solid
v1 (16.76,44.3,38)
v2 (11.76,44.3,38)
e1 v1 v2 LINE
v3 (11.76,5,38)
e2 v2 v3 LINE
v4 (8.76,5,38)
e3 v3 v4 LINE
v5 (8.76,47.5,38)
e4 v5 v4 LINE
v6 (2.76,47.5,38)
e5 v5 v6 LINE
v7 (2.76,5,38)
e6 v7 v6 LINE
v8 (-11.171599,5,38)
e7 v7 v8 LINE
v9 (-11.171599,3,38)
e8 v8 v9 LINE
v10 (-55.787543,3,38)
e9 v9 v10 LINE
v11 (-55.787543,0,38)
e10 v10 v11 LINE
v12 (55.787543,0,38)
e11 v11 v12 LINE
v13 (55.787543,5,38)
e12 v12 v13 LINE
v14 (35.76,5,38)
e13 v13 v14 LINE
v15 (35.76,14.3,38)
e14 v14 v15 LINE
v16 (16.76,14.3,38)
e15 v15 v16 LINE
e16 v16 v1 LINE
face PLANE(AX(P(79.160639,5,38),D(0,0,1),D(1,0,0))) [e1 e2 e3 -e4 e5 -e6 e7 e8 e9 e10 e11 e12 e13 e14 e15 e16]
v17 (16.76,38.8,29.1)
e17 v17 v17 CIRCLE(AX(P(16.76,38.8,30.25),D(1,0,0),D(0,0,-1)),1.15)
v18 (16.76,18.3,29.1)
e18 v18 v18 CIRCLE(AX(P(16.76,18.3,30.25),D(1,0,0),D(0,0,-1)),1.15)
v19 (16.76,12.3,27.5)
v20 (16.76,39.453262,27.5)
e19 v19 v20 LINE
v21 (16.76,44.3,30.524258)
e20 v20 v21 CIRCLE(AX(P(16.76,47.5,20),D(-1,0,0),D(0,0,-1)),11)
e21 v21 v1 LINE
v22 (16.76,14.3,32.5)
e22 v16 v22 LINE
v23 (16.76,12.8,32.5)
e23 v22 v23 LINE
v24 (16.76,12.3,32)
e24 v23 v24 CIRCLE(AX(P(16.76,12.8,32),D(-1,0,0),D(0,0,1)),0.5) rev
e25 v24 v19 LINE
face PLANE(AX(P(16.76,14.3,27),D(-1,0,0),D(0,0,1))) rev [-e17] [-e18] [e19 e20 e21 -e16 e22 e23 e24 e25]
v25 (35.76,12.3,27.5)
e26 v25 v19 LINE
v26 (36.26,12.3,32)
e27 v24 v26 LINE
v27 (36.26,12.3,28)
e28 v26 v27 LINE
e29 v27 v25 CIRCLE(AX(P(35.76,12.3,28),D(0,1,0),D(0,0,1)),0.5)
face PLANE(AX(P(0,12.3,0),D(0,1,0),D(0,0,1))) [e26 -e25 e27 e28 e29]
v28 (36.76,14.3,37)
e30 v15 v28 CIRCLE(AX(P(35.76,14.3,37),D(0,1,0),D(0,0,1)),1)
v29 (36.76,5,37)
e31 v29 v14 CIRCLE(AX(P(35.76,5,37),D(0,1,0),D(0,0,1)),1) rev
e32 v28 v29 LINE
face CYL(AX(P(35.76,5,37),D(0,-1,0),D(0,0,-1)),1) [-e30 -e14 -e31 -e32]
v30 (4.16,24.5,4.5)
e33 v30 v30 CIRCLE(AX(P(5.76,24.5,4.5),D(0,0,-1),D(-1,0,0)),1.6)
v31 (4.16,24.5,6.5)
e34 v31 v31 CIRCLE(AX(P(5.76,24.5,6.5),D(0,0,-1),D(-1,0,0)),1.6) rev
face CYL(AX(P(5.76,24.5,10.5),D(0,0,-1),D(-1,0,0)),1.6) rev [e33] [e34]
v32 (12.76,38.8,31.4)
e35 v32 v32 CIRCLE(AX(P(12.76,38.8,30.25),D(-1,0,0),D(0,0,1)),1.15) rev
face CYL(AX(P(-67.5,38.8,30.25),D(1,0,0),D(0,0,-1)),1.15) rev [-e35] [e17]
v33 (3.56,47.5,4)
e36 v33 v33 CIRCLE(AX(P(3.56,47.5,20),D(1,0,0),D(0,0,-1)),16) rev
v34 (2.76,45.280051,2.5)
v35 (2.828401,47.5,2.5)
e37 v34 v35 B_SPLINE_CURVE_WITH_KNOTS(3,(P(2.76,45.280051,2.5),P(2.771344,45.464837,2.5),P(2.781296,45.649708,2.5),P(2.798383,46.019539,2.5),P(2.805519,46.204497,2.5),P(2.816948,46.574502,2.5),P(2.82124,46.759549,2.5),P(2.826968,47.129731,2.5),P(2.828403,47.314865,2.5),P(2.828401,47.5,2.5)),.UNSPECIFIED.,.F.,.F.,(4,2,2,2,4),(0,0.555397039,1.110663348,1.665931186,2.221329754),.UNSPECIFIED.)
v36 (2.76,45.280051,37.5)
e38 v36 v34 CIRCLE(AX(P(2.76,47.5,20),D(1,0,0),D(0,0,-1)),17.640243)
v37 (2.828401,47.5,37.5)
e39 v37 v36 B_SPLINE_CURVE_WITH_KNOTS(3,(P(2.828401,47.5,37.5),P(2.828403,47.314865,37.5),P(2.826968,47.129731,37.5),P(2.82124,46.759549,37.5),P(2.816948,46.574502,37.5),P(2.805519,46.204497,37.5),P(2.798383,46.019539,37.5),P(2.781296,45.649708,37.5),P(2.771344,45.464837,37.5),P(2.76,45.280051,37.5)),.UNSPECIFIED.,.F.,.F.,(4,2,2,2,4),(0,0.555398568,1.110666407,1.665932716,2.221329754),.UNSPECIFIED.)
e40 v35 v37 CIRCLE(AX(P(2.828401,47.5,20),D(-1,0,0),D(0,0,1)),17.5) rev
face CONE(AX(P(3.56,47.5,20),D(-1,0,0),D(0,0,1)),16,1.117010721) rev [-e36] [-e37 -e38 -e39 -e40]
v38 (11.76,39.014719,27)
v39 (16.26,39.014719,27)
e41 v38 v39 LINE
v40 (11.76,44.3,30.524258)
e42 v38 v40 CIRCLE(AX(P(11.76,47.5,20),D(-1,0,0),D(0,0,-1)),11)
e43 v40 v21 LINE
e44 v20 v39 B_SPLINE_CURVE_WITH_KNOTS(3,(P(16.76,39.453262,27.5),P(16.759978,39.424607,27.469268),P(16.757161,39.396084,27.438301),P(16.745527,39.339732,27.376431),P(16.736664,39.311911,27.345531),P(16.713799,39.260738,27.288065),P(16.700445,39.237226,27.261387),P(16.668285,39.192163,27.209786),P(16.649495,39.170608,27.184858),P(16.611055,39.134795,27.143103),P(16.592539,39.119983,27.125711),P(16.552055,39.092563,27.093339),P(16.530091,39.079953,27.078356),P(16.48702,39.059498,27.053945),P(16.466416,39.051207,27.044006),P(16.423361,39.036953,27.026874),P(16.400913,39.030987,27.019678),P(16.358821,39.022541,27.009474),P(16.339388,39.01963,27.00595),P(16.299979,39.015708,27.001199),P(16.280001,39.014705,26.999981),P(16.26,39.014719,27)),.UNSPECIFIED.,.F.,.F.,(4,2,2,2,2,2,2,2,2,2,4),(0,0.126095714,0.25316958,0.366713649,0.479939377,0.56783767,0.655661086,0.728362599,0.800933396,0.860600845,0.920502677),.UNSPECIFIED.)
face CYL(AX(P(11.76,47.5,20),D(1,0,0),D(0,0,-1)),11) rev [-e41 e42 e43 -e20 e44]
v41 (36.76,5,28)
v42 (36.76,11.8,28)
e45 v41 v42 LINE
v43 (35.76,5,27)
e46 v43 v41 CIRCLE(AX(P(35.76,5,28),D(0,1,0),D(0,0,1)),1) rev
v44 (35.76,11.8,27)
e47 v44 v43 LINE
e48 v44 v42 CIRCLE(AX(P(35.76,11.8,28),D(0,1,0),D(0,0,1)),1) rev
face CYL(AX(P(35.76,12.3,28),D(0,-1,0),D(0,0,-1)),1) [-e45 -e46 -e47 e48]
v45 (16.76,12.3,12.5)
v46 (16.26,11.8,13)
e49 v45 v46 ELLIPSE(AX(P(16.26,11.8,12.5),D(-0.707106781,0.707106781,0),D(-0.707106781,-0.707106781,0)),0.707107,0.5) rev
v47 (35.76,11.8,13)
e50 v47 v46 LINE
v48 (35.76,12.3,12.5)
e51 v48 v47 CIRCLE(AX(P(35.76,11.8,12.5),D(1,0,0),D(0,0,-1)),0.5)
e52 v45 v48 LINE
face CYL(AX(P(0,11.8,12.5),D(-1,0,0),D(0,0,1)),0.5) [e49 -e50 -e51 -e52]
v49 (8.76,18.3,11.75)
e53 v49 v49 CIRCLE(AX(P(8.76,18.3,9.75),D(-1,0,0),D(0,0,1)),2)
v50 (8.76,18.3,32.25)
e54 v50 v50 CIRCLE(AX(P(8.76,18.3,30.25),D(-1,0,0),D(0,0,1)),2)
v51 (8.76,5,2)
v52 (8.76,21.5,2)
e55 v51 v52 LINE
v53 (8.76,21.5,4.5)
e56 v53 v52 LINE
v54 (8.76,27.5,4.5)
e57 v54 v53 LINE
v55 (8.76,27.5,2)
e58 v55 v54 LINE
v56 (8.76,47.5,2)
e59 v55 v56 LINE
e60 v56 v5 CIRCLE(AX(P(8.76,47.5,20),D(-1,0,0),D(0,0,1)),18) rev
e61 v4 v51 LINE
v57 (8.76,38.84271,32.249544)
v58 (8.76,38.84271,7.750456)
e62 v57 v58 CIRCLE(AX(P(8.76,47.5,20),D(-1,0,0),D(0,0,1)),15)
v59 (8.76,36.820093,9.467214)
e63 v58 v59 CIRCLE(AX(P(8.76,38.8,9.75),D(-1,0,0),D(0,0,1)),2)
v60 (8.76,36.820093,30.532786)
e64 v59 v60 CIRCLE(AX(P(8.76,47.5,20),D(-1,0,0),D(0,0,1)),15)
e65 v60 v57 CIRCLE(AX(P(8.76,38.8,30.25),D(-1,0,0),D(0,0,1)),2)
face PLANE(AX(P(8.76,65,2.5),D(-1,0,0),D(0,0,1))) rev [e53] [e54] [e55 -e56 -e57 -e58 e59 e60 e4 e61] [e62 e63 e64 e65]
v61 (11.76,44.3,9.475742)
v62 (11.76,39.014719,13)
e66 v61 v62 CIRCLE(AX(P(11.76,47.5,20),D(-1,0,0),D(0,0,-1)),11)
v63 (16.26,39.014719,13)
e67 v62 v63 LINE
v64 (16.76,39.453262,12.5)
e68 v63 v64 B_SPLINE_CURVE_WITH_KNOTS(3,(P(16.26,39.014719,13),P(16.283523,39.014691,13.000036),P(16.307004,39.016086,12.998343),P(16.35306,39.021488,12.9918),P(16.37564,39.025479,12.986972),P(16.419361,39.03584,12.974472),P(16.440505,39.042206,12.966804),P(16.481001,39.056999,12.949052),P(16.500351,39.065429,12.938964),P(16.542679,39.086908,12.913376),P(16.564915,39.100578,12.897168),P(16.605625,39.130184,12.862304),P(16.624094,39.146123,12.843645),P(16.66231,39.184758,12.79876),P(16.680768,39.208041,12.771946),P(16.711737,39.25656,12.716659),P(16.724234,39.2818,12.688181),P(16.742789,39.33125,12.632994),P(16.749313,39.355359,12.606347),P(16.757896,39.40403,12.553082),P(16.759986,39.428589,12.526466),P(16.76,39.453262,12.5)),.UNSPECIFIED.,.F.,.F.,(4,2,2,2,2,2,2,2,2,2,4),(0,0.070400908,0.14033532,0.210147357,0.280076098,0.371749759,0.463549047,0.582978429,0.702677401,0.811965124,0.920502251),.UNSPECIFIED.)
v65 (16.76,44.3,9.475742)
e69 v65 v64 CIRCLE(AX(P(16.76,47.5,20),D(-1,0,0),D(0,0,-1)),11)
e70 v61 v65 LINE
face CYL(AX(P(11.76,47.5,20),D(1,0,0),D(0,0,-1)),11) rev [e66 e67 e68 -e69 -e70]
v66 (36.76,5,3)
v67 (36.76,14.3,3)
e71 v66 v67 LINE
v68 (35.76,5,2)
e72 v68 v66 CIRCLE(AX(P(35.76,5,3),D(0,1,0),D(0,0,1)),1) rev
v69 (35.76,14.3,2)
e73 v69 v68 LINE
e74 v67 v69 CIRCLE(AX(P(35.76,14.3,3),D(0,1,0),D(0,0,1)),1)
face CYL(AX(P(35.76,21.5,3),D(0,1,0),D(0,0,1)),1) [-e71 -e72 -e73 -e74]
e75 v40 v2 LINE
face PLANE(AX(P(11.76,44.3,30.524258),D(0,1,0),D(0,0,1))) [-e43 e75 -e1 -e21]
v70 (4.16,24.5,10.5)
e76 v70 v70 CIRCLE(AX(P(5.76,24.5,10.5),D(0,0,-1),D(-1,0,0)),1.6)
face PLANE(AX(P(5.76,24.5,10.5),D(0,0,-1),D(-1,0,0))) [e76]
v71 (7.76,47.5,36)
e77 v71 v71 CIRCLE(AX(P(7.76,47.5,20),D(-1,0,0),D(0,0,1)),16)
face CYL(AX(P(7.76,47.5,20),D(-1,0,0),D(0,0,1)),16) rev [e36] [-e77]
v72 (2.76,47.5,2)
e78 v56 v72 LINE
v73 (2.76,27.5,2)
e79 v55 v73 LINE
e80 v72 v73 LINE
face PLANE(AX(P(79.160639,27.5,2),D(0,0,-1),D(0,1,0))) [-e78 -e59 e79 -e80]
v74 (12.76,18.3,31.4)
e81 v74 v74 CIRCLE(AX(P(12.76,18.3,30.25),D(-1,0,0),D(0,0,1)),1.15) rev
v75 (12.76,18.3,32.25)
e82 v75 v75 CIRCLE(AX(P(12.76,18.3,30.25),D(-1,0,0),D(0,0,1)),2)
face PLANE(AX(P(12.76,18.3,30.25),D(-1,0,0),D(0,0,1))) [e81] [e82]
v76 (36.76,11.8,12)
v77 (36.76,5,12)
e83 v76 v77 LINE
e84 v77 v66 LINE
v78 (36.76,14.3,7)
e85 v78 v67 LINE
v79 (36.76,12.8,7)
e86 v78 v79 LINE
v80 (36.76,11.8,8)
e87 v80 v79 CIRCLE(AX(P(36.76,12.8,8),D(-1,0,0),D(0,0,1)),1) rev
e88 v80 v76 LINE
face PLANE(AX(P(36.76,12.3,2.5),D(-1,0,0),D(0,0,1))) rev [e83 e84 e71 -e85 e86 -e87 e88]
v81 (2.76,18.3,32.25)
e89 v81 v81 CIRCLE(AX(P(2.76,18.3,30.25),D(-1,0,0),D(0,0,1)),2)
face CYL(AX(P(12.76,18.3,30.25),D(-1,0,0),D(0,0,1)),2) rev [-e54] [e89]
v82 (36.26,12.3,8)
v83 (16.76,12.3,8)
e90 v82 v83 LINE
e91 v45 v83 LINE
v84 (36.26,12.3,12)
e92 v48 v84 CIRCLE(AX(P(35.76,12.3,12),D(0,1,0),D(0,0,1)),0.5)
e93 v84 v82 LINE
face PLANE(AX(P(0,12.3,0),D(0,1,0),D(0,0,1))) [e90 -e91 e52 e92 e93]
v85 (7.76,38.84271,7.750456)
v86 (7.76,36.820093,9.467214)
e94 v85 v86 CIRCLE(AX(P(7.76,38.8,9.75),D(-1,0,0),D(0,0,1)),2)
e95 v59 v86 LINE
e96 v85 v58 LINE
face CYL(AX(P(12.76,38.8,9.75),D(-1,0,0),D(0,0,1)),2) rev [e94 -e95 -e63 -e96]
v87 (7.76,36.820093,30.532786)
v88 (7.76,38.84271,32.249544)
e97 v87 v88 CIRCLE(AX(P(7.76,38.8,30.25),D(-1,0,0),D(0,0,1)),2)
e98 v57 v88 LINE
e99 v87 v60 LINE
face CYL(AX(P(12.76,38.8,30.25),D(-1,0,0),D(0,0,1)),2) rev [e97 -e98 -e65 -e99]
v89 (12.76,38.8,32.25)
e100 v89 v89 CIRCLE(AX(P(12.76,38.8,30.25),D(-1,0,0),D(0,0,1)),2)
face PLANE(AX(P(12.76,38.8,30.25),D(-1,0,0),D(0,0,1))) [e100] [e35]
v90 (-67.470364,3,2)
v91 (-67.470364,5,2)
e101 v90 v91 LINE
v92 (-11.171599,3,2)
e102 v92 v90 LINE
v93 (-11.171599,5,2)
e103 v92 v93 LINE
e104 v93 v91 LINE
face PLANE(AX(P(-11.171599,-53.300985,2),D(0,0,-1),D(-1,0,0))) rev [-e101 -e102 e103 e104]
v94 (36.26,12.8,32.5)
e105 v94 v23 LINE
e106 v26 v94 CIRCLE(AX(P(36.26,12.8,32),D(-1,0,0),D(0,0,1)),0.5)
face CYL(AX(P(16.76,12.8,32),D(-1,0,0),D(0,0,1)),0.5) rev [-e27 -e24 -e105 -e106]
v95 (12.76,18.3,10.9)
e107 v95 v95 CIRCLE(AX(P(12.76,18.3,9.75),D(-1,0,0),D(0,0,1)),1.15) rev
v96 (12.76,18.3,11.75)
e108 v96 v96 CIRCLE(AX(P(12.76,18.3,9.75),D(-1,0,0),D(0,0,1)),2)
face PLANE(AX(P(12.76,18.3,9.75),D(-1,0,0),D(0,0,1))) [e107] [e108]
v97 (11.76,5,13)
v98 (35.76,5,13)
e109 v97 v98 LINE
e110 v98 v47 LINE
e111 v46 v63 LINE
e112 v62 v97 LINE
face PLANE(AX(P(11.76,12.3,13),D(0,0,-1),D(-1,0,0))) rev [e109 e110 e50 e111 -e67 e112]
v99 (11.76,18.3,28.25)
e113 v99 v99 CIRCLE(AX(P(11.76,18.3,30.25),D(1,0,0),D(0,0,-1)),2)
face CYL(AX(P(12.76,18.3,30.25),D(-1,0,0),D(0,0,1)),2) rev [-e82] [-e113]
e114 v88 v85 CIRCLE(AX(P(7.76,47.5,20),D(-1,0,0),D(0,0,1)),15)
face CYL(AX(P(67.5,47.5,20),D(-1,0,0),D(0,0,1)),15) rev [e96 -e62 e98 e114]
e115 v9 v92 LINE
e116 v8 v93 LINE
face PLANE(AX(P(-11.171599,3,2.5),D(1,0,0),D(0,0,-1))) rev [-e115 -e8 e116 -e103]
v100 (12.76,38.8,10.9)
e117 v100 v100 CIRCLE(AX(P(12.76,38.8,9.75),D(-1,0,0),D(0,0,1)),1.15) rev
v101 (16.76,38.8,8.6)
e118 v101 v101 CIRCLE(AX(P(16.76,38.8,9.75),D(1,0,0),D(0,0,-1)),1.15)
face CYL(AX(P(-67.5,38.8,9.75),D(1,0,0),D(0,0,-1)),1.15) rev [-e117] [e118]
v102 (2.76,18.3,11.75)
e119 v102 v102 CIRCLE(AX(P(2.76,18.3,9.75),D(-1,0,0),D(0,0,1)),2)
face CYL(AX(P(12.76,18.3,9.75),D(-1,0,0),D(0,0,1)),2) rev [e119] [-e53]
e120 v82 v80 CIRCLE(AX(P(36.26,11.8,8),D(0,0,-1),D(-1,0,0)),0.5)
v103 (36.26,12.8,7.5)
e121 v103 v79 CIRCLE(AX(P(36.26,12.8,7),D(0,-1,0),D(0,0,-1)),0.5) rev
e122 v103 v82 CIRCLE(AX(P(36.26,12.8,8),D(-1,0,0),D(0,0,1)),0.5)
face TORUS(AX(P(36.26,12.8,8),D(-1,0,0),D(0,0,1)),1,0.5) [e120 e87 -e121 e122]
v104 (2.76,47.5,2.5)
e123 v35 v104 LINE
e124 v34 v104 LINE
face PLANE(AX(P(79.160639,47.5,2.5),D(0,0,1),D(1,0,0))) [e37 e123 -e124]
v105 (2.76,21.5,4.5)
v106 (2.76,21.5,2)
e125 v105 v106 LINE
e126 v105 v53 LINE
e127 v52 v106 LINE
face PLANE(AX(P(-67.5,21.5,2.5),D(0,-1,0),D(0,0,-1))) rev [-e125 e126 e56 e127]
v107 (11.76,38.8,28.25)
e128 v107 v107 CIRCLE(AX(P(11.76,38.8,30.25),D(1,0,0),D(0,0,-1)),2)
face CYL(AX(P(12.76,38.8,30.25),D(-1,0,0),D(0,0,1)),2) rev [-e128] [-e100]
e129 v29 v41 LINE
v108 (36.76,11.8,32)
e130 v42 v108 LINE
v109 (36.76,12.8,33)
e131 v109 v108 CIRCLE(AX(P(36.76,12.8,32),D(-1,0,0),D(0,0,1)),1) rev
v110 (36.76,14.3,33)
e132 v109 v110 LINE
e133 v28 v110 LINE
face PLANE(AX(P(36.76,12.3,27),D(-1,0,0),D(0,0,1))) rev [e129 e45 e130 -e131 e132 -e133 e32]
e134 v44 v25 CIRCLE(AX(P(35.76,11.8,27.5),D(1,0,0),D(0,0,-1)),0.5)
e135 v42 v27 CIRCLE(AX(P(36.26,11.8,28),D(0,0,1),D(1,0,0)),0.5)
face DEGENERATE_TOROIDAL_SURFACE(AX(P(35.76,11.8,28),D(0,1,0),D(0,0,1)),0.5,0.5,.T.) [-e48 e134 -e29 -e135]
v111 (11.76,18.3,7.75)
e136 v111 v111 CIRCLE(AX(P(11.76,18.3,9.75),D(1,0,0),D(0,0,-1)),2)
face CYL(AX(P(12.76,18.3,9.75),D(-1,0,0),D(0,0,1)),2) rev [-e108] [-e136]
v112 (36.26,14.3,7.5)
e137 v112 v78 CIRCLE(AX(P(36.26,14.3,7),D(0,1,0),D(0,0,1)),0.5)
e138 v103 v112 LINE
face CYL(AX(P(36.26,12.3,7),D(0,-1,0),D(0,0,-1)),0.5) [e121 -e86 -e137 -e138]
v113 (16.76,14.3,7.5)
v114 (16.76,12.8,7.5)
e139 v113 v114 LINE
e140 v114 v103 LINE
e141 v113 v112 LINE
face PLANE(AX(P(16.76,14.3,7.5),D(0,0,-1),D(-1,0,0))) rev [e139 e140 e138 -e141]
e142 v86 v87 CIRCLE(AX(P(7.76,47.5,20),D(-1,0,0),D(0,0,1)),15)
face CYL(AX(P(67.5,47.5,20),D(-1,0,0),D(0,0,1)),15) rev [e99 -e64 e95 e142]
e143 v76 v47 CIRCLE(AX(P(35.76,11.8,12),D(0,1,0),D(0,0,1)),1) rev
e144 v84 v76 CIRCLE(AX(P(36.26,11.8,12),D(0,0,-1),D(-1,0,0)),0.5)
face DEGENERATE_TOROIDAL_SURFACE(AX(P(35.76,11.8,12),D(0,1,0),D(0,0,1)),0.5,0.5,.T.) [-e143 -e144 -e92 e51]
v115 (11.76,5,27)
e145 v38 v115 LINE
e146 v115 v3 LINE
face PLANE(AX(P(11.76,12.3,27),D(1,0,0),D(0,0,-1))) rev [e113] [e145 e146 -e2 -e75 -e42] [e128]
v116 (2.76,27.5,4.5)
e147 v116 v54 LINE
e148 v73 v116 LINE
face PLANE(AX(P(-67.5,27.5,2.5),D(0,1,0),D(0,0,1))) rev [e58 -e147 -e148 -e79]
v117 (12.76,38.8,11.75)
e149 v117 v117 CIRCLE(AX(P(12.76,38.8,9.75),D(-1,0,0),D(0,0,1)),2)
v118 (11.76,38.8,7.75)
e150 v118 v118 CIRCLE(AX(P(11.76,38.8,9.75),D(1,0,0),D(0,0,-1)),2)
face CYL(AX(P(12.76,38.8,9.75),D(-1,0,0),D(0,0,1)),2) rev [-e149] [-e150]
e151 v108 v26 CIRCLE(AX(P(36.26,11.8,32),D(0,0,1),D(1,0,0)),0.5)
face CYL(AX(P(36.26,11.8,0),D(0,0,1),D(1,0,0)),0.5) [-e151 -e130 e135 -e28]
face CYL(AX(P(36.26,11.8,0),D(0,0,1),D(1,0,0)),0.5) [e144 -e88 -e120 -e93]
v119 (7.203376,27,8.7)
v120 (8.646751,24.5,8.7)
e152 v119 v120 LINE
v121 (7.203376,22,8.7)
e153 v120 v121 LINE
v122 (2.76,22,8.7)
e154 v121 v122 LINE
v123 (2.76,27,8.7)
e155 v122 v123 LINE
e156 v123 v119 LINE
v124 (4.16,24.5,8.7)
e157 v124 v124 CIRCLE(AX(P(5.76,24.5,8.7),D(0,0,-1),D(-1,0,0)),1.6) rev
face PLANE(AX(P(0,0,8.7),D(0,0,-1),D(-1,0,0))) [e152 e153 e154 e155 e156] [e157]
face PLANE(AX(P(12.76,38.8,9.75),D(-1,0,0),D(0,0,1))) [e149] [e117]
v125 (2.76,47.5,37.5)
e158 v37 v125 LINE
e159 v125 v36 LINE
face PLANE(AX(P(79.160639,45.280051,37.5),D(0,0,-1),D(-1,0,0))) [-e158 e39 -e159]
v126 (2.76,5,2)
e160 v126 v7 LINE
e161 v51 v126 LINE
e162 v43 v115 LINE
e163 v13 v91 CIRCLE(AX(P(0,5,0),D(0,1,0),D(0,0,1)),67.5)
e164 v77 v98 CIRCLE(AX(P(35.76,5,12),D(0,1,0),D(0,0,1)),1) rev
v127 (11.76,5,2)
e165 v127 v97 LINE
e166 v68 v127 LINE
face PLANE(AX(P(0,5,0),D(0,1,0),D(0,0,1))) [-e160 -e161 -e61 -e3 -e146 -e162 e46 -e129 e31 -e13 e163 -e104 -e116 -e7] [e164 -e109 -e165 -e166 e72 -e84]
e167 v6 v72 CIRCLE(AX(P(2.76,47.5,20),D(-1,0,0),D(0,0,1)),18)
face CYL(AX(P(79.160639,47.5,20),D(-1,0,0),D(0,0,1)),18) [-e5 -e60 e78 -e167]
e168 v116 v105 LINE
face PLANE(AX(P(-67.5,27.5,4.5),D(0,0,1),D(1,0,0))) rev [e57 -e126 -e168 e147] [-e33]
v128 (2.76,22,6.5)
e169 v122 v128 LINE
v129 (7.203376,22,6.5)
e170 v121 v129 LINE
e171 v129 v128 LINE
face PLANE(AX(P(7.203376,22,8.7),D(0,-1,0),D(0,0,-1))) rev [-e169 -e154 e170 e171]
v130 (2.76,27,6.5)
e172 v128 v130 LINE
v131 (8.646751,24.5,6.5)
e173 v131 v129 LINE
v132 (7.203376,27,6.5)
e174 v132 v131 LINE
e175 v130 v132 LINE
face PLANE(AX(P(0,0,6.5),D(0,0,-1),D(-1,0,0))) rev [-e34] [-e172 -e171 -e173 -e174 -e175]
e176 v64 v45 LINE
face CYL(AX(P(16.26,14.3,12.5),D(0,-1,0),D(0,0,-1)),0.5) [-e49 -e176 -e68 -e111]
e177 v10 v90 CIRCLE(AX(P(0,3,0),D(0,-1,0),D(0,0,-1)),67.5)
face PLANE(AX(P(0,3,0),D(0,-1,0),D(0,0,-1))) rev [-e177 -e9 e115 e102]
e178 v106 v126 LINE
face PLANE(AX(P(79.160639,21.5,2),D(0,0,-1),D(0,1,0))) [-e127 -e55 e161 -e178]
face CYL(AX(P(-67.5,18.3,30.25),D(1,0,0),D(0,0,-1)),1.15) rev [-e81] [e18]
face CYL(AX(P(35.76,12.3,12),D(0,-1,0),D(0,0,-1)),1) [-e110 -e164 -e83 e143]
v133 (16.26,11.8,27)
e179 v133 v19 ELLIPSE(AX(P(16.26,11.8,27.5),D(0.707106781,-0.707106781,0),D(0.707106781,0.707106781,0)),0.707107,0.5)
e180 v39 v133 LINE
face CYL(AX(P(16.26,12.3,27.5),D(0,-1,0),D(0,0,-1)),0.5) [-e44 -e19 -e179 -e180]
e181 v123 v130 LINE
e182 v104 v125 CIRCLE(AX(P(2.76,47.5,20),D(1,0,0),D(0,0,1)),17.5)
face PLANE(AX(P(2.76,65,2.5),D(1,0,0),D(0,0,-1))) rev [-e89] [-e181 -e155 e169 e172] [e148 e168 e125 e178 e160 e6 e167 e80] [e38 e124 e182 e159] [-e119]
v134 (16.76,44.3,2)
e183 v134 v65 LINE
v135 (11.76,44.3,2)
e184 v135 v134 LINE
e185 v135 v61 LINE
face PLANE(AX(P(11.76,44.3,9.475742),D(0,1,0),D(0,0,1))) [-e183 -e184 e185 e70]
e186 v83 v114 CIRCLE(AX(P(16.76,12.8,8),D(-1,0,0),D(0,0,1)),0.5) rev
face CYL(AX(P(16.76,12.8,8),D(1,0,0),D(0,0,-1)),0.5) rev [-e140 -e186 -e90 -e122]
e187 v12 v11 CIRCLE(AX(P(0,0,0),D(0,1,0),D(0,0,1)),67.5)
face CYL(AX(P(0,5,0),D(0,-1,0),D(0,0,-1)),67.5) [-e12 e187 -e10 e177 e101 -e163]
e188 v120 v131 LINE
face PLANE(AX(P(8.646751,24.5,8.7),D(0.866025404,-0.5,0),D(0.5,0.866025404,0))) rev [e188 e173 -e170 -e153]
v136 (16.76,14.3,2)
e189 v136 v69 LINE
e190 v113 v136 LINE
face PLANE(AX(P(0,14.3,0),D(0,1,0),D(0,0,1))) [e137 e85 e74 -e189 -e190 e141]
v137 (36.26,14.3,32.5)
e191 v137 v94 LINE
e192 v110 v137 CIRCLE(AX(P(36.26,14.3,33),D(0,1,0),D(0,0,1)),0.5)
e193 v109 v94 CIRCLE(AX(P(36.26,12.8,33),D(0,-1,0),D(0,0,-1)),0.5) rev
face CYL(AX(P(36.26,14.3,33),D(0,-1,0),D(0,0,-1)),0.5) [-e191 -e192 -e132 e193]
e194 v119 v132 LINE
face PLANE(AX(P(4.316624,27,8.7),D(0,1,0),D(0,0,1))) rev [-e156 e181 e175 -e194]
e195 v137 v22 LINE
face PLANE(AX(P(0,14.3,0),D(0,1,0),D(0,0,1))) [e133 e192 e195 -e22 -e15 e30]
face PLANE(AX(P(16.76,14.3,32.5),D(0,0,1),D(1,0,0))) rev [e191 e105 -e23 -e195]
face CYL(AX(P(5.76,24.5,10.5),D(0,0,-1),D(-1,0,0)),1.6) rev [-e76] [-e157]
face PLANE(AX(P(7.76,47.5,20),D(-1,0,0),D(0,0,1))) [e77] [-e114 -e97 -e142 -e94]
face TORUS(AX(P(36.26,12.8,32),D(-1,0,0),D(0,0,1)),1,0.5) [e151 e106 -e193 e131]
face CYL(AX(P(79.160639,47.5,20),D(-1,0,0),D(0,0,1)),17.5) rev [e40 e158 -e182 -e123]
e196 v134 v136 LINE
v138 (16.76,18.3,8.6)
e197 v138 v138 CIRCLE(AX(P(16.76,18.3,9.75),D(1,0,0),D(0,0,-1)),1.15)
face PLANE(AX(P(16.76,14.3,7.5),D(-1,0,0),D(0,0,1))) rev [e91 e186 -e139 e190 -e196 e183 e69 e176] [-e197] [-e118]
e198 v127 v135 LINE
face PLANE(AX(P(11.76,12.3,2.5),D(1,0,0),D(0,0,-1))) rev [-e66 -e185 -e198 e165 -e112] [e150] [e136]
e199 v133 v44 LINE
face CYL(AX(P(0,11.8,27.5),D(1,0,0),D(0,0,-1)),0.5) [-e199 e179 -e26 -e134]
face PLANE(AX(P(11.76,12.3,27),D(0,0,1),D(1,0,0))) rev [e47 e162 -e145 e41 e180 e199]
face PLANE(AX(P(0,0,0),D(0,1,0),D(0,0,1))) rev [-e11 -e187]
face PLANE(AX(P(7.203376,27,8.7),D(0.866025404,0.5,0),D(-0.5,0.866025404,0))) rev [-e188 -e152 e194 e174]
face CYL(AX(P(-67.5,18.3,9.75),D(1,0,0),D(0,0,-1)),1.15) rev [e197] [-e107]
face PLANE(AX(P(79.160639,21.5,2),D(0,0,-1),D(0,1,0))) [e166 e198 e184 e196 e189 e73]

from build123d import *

# Parameters (mm, degrees)
SKETCH_1_R               = 67.5
EXTRUDE_1_DEPTH          = 5
SKETCH_2_W               = 6
SKETCH_2_H               = 35
EXTRUDE_2_DEPTH          = 60
FILLET_1_R               = 17.5
SKETCH_3_R               = 16
CUT_EXTRUDE_1_DEPTH      = 5
CHAMFER_1_SIZE           = 1.640243073
CHAMFER_1_SIZE_2         = 0.8
SKETCH_4_R               = 15
CUT_EXTRUDE_2_DEPTH      = 121.188675061
SKETCH_6_W               = 2
SKETCH_6_H               = 6
CUT_EXTRUDE_3_DEPTH      = 121.817372977
SKETCH_8_R               = 1.6
CUT_EXTRUDE_5_DEPTH      = 6
CUT_EXTRUDE_START        = -2
CUT_EXTRUDE_8_DEPTH      = 2.2
SKETCH_11_W              = 25
SKETCH_11_H              = 10.5
EXTRUDE_4_DEPTH          = 7.3
EXTRUDE_5_DEPTH          = 2
FILLET_3_R               = 1
EXTRUDE_6_DEPTH          = 5
SKETCH_14_R              = 1.15
CUT_EXTRUDE_10_DEPTH     = 127.019830237
FILLET_2_R               = 0.5
SKETCH_15_R              = 2
CUT_EXTRUDE_11_DEPTH     = 10
SKETCH_16_W              = 56.328401117
SKETCH_16_H              = 65
CUT_EXTRUDE_12_DEPTH     = 2
SKETCH_17_W              = 112.249721604
SKETCH_17_H              = 30
CUT_EXTRUDE_13_DEPTH     = 113.749722891
SKETCH2_W                = 0.5
SKETCH2_H                = 16.5
BOSS_EXTRUDE1_DEPTH      = 6
BOSS_EXTRUDE2_DEPTH      = 0.5
BOSS_EXTRUDE2_DEPTH_BACK = 3
FILLET1_R                = 1
BOSS_EXTRUDE3_DEPTH      = 0.5
SKETCH5_OUTSIDE_W        = 173.686
SKETCH5_OUTSIDE_H        = 144.186
SKETCH5_OUTSIDE_R        = 67.5
CUT_EXTRUDE1_DEPTH       = 10
SKETCH6_W                = 2.105553893
SKETCH6_H                = 9.3
BOSS_EXTRUDE4_DEPTH      = 3
FILLET2_R                = 1
CUT_EXTRUDE2_START       = -2
CUT_EXTRUDE2_DEPTH       = 2


# Some blends are built 0.0001 mm under size
with BuildPart() as part:
    # 스케치1 → 보스-돌출1 (new body)
    with BuildSketch(Plane(origin=(0, 0, 0), x_dir=(1, 0, 0), z_dir=(0, 1, 0))):
        with Locations(Location((0, 0, 0), (0, 0, 270))):
            Circle(SKETCH_1_R)
    extrude(amount=EXTRUDE_1_DEPTH)

    # 스케치2 → 보스-돌출2 (add)
    with BuildSketch(Plane(origin=(0, 5, 0), x_dir=(1, 0, 0), z_dir=(0, 1, 0))):
        with Locations((5.76, -20)):
            Rectangle(SKETCH_2_W, SKETCH_2_H)
    extrude(amount=EXTRUDE_2_DEPTH)

    # 필렛1
    fillet_1_edges = [part.edges().sort_by_distance(p)[0] for p in [
        (5.76, 65, 2.5),
        (5.76, 65, 37.5),
    ]]
    fillet(fillet_1_edges, radius=FILLET_1_R - 0.0001)  # a hair under: the kernel refuses the full size

    # 스케치3 → 컷-돌출1 (cut)
    with BuildSketch(Plane.ZY.offset(-2.76)):
        with Locations((20, 47.5)):
            Circle(SKETCH_3_R)
    extrude(amount=-CUT_EXTRUDE_1_DEPTH, mode=Mode.SUBTRACT)

    # 모따기1
    # the kernel refuses this chamfer: 1.640243073, 0.8 mm, written as the material it takes off along each edge
    with BuildSketch(Plane(origin=(2.76, 47.5, 20), x_dir=(0, 0, 1), z_dir=(0, -1, 0))) as chamfer_1_piece_1:
        Polygon((16 + CHAMFER_1_SIZE, 0), (16, -CHAMFER_1_SIZE_2), (16, 0), align=None)
    revolve(axis=Axis((2.76, 47.5, 20), (-1, 0, 0)), mode=Mode.SUBTRACT)

    # 스케치4 → 컷-돌출2 (cut, through all)
    with BuildSketch(Plane.ZY.offset(-7.76)):
        with Locations((20, 47.5)):
            Circle(SKETCH_4_R)
    extrude(amount=-CUT_EXTRUDE_2_DEPTH, mode=Mode.SUBTRACT)

    # 스케치6 → 컷-돌출3 (cut, through all)
    with BuildSketch(Plane(origin=(8.76, 0, 0), x_dir=(0, 0, -1), z_dir=(1, 0, 0))):
        with Locations((-3.5, 24.5)):
            Rectangle(SKETCH_6_W, SKETCH_6_H)
    extrude(amount=-CUT_EXTRUDE_3_DEPTH, mode=Mode.SUBTRACT)

    # 스케치8 → 컷-돌출5 (cut)
    with BuildSketch(Plane(origin=(0, 0, 4.5), x_dir=(-1, 0, 0), z_dir=(0, 0, -1))):
        with Locations((-5.76, 24.5)):
            Circle(SKETCH_8_R)
    extrude(amount=-CUT_EXTRUDE_5_DEPTH, mode=Mode.SUBTRACT)

    # 스케치9 → 컷-돌출8 (cut)
    with BuildSketch(Plane(origin=(0, 0, 4.5), x_dir=(-1, 0, 0), z_dir=(0, 0, -1)).offset(CUT_EXTRUDE_START)):
        Polygon((-4.316624327, 27), (-7.203375673, 27), (-8.646751346, 24.5), (-7.203375673, 22), (-4.316624327, 22), (-2.76, 22), (-2.76, 27), align=None)
    extrude(amount=-CUT_EXTRUDE_8_DEPTH, mode=Mode.SUBTRACT)

    # 스케치11 → 보스-돌출4 (add)
    with BuildSketch(Plane(origin=(0, 5, 0), x_dir=(1, 0, 0), z_dir=(0, 1, 0))):
        with Locations((24.26, -7.75)):
            Rectangle(SKETCH_11_W, SKETCH_11_H)
        with Locations((24.26, -32.25)):
            Rectangle(SKETCH_11_W, SKETCH_11_H)
    extrude(amount=EXTRUDE_4_DEPTH)

    # 스케치12 → 보스-돌출5 (add)
    with BuildSketch(Plane(origin=(0, 12.3, 0), x_dir=(1, 0, 0), z_dir=(0, 1, 0))):
        Polygon((16.76, -32.5), (36.76, -32.5), (36.76, -37.5), (11.76, -37.5), (11.76, -27), (16.76, -27), align=None)
        Polygon((11.76, -2.5), (36.76, -2.5), (36.76, -7.5), (16.76, -7.5), (16.76, -13), (11.76, -13), align=None)
    extrude(amount=EXTRUDE_5_DEPTH)

    # 필렛3
    fillet_3_edges = [part.edges().sort_by_distance(p)[0] for p in [
        (36.76, 9.65, 2.5),
        (36.76, 9.65, 37.5),
        (36.76, 8.65, 27),
        (36.76, 8.65, 13),
    ]]
    fillet(fillet_3_edges, radius=FILLET_3_R)

    # 스케치13 → 보스-돌출6 (add)
    with BuildSketch(Plane(origin=(16.76, 0, 0), x_dir=(0, 0, -1), z_dir=(1, 0, 0))):
        with BuildLine():
            Line((-27, 14.3), (-37.5, 14.3))
            Line((-37.5, 14.3), (-37.5, 44.3))
            Line((-37.5, 44.3), (-30.524257694, 44.3))
            ThreePointArc((-30.524257694, 44.3), (-29.151964364, 41.397414624), (-27, 39.014718626))
            Line((-27, 39.014718626), (-27, 14.3))
        make_face()
        with BuildLine():
            Line((-13, 14.3), (-2.5, 14.3))
            Line((-2.5, 14.3), (-2.5, 44.3))
            Line((-2.5, 44.3), (-9.475742306, 44.3))
            ThreePointArc((-9.475742306, 44.3), (-10.848035636, 41.397414624), (-13, 39.014718626))
            Line((-13, 39.014718626), (-13, 14.3))
        make_face()
    extrude(amount=-EXTRUDE_6_DEPTH)

    # 스케치14 → 컷-돌출10 (cut, through all)
    with BuildSketch(Plane(origin=(16.76, 0, 0), x_dir=(0, 0, -1), z_dir=(1, 0, 0))):
        with Locations((-30.25, 18.3)):
            Circle(SKETCH_14_R)
        with Locations((-9.75, 18.3)):
            Circle(SKETCH_14_R)
        with Locations((-9.75, 38.8)):
            Circle(SKETCH_14_R)
        with Locations((-30.25, 38.8)):
            Circle(SKETCH_14_R)
    extrude(amount=-CUT_EXTRUDE_10_DEPTH, mode=Mode.SUBTRACT)

    # 필렛2
    fillet_2_edges = [part.edges().sort_by_distance(p)[0] for p in [
        (26.26, 12.3, 13),
        (16.76, 25.657359313, 13),
        (26.76, 12.3, 7.5),
        (36.76, 13.3, 7.5),
        (36.76, 12.3, 30.25),
        (16.76, 25.657359313, 27),
        (26.76, 12.3, 32.5),
        (36.76, 13.3, 32.5),
        (26.26, 12.3, 27),
        (36.467106781, 12.3, 27.292893219),
        (36.76, 12.3, 9.75),
        (36.467106781, 12.3, 12.707106781),
    ]]
    fillet(fillet_2_edges, radius=FILLET_2_R)

    # 스케치15 → 컷-돌출11 (cut)
    with BuildSketch(Plane.ZY.offset(-2.76)):
        with Locations((9.75, 38.8)):
            Circle(SKETCH_15_R)
        with Locations((30.25, 38.8)):
            Circle(SKETCH_15_R)
        with Locations((9.75, 18.3)):
            Circle(SKETCH_15_R)
        with Locations((30.25, 18.3)):
            Circle(SKETCH_15_R)
    extrude(amount=-CUT_EXTRUDE_11_DEPTH, mode=Mode.SUBTRACT)

    # 스케치16 → 컷-돌출12 (cut)
    with BuildSketch(Plane(origin=(0, 5, 0), x_dir=(1, 0, 0), z_dir=(0, 1, 0))):
        with Locations((-39.335799442, -35)):
            Rectangle(SKETCH_16_W, SKETCH_16_H)
    extrude(amount=-CUT_EXTRUDE_12_DEPTH, mode=Mode.SUBTRACT)

    # 스케치17 → 컷-돌출13 (cut, through all)
    with BuildSketch(Plane(origin=(0, 5, 0), x_dir=(1, 0, 0), z_dir=(0, 1, 0))):
        with Locations((0, -52.5)):
            Rectangle(SKETCH_17_W, SKETCH_17_H)
    extrude(amount=-CUT_EXTRUDE_13_DEPTH, mode=Mode.SUBTRACT)

    # Sketch2 → Boss-Extrude1 (add)
    with BuildSketch(Plane.ZY.offset(-2.76)):
        with BuildLine():
            Line((2, 27.5), (2, 47.5))
            ThreePointArc((2, 47.5), (20, 65.5), (38, 47.5))
            Line((38, 47.5), (38, 5))
            Line((38, 5), (37.5, 5))
            Line((37.5, 5), (37.5, 45.280050522))
            Line((37.5, 45.280050522), (37.5, 47.5))
            ThreePointArc((37.5, 47.5), (32.374368671, 59.874368671), (20, 65))
            ThreePointArc((20, 65), (7.625631329, 59.874368671), (2.5, 47.5))
            Line((2.5, 47.5), (2.5, 45.280050522))
            Line((2.5, 45.280050522), (2.5, 27.5))
            Line((2.5, 27.5), (2, 27.5))
        make_face()
        with Locations((2.25, 13.25)):
            Rectangle(SKETCH2_W, SKETCH2_H)
    extrude(amount=-BOSS_EXTRUDE1_DEPTH)

    # Sketch3 → Boss-Extrude2 (add, two sides: drawn at the far end of the back side and taken through both)
    with BuildSketch(Plane(origin=(0, 0, 2.5), x_dir=(-1, 0, 0), z_dir=(0, 0, -1)).offset(-BOSS_EXTRUDE2_DEPTH_BACK)):
        Polygon((-36.76, 5), (-36.76, 14.3), (-16.76, 14.3), (-16.76, 44.3), (-11.76, 44.3), (-11.76, 5), align=None)
    extrude(amount=BOSS_EXTRUDE2_DEPTH + BOSS_EXTRUDE2_DEPTH_BACK)

    # Fillet1
    fillet1_edges = [part.edges().sort_by_distance(p)[0] for p in [
        (36.76, 9.65, 2),
    ]]
    fillet(fillet1_edges, radius=FILLET1_R)

    # Sketch4 → Boss-Extrude3 (add)
    with BuildSketch(Plane.XY.offset(37.5)):
        Polygon((11.76, 5), (8.76, 5), (2.76, 5), (-11.171598883, 5), (-11.171598883, 3), (-56.124860802, 3), (-56.124860802, 0), (56.124860802, 0), (56.124860802, 5), (35.76, 5), (35.76, 14.3), (16.76, 14.3), (16.76, 44.3), (11.76, 44.3), align=None)
    extrude(amount=BOSS_EXTRUDE3_DEPTH)

    # Sketch5 outside → Cut-Extrude1 (cut)
    with BuildSketch(Plane.XZ):
        with Locations((0, -14.75)):
            Rectangle(SKETCH5_OUTSIDE_W, SKETCH5_OUTSIDE_H)
        Circle(SKETCH5_OUTSIDE_R, mode=Mode.SUBTRACT)
    extrude(amount=-CUT_EXTRUDE1_DEPTH, mode=Mode.SUBTRACT)

    # Sketch6 → Boss-Extrude4 (add)
    with BuildSketch(Plane.XY.offset(38)):
        with Locations((35.707223054, 9.65)):
            Rectangle(SKETCH6_W, SKETCH6_H)
    extrude(amount=-BOSS_EXTRUDE4_DEPTH)

    # Fillet2
    fillet2_edges = [part.edges().sort_by_distance(p)[0] for p in [
        (36.76, 9.65, 38),
    ]]
    fillet(fillet2_edges, radius=FILLET2_R)

    # Sketch7 → Cut-Extrude2 (cut)
    with BuildSketch(Plane(origin=(0, 5, 0), x_dir=(1, 0, 0), z_dir=(0, 1, 0)).offset(CUT_EXTRUDE2_START)):
        with BuildLine():
            Line((-11.171598883, -2), (-11.171598883, -2.5))
            Line((-11.171598883, -2.5), (-67.453687816, -2.5))
            ThreePointArc((-67.453687816, -2.5), (-67.462489062, -2.250015449), (-67.470363864, -2))
            Line((-67.470363864, -2), (-11.171598883, -2))
        make_face()
    extrude(amount=CUT_EXTRUDE2_DEPTH, mode=Mode.SUBTRACT)


solid = part.part
